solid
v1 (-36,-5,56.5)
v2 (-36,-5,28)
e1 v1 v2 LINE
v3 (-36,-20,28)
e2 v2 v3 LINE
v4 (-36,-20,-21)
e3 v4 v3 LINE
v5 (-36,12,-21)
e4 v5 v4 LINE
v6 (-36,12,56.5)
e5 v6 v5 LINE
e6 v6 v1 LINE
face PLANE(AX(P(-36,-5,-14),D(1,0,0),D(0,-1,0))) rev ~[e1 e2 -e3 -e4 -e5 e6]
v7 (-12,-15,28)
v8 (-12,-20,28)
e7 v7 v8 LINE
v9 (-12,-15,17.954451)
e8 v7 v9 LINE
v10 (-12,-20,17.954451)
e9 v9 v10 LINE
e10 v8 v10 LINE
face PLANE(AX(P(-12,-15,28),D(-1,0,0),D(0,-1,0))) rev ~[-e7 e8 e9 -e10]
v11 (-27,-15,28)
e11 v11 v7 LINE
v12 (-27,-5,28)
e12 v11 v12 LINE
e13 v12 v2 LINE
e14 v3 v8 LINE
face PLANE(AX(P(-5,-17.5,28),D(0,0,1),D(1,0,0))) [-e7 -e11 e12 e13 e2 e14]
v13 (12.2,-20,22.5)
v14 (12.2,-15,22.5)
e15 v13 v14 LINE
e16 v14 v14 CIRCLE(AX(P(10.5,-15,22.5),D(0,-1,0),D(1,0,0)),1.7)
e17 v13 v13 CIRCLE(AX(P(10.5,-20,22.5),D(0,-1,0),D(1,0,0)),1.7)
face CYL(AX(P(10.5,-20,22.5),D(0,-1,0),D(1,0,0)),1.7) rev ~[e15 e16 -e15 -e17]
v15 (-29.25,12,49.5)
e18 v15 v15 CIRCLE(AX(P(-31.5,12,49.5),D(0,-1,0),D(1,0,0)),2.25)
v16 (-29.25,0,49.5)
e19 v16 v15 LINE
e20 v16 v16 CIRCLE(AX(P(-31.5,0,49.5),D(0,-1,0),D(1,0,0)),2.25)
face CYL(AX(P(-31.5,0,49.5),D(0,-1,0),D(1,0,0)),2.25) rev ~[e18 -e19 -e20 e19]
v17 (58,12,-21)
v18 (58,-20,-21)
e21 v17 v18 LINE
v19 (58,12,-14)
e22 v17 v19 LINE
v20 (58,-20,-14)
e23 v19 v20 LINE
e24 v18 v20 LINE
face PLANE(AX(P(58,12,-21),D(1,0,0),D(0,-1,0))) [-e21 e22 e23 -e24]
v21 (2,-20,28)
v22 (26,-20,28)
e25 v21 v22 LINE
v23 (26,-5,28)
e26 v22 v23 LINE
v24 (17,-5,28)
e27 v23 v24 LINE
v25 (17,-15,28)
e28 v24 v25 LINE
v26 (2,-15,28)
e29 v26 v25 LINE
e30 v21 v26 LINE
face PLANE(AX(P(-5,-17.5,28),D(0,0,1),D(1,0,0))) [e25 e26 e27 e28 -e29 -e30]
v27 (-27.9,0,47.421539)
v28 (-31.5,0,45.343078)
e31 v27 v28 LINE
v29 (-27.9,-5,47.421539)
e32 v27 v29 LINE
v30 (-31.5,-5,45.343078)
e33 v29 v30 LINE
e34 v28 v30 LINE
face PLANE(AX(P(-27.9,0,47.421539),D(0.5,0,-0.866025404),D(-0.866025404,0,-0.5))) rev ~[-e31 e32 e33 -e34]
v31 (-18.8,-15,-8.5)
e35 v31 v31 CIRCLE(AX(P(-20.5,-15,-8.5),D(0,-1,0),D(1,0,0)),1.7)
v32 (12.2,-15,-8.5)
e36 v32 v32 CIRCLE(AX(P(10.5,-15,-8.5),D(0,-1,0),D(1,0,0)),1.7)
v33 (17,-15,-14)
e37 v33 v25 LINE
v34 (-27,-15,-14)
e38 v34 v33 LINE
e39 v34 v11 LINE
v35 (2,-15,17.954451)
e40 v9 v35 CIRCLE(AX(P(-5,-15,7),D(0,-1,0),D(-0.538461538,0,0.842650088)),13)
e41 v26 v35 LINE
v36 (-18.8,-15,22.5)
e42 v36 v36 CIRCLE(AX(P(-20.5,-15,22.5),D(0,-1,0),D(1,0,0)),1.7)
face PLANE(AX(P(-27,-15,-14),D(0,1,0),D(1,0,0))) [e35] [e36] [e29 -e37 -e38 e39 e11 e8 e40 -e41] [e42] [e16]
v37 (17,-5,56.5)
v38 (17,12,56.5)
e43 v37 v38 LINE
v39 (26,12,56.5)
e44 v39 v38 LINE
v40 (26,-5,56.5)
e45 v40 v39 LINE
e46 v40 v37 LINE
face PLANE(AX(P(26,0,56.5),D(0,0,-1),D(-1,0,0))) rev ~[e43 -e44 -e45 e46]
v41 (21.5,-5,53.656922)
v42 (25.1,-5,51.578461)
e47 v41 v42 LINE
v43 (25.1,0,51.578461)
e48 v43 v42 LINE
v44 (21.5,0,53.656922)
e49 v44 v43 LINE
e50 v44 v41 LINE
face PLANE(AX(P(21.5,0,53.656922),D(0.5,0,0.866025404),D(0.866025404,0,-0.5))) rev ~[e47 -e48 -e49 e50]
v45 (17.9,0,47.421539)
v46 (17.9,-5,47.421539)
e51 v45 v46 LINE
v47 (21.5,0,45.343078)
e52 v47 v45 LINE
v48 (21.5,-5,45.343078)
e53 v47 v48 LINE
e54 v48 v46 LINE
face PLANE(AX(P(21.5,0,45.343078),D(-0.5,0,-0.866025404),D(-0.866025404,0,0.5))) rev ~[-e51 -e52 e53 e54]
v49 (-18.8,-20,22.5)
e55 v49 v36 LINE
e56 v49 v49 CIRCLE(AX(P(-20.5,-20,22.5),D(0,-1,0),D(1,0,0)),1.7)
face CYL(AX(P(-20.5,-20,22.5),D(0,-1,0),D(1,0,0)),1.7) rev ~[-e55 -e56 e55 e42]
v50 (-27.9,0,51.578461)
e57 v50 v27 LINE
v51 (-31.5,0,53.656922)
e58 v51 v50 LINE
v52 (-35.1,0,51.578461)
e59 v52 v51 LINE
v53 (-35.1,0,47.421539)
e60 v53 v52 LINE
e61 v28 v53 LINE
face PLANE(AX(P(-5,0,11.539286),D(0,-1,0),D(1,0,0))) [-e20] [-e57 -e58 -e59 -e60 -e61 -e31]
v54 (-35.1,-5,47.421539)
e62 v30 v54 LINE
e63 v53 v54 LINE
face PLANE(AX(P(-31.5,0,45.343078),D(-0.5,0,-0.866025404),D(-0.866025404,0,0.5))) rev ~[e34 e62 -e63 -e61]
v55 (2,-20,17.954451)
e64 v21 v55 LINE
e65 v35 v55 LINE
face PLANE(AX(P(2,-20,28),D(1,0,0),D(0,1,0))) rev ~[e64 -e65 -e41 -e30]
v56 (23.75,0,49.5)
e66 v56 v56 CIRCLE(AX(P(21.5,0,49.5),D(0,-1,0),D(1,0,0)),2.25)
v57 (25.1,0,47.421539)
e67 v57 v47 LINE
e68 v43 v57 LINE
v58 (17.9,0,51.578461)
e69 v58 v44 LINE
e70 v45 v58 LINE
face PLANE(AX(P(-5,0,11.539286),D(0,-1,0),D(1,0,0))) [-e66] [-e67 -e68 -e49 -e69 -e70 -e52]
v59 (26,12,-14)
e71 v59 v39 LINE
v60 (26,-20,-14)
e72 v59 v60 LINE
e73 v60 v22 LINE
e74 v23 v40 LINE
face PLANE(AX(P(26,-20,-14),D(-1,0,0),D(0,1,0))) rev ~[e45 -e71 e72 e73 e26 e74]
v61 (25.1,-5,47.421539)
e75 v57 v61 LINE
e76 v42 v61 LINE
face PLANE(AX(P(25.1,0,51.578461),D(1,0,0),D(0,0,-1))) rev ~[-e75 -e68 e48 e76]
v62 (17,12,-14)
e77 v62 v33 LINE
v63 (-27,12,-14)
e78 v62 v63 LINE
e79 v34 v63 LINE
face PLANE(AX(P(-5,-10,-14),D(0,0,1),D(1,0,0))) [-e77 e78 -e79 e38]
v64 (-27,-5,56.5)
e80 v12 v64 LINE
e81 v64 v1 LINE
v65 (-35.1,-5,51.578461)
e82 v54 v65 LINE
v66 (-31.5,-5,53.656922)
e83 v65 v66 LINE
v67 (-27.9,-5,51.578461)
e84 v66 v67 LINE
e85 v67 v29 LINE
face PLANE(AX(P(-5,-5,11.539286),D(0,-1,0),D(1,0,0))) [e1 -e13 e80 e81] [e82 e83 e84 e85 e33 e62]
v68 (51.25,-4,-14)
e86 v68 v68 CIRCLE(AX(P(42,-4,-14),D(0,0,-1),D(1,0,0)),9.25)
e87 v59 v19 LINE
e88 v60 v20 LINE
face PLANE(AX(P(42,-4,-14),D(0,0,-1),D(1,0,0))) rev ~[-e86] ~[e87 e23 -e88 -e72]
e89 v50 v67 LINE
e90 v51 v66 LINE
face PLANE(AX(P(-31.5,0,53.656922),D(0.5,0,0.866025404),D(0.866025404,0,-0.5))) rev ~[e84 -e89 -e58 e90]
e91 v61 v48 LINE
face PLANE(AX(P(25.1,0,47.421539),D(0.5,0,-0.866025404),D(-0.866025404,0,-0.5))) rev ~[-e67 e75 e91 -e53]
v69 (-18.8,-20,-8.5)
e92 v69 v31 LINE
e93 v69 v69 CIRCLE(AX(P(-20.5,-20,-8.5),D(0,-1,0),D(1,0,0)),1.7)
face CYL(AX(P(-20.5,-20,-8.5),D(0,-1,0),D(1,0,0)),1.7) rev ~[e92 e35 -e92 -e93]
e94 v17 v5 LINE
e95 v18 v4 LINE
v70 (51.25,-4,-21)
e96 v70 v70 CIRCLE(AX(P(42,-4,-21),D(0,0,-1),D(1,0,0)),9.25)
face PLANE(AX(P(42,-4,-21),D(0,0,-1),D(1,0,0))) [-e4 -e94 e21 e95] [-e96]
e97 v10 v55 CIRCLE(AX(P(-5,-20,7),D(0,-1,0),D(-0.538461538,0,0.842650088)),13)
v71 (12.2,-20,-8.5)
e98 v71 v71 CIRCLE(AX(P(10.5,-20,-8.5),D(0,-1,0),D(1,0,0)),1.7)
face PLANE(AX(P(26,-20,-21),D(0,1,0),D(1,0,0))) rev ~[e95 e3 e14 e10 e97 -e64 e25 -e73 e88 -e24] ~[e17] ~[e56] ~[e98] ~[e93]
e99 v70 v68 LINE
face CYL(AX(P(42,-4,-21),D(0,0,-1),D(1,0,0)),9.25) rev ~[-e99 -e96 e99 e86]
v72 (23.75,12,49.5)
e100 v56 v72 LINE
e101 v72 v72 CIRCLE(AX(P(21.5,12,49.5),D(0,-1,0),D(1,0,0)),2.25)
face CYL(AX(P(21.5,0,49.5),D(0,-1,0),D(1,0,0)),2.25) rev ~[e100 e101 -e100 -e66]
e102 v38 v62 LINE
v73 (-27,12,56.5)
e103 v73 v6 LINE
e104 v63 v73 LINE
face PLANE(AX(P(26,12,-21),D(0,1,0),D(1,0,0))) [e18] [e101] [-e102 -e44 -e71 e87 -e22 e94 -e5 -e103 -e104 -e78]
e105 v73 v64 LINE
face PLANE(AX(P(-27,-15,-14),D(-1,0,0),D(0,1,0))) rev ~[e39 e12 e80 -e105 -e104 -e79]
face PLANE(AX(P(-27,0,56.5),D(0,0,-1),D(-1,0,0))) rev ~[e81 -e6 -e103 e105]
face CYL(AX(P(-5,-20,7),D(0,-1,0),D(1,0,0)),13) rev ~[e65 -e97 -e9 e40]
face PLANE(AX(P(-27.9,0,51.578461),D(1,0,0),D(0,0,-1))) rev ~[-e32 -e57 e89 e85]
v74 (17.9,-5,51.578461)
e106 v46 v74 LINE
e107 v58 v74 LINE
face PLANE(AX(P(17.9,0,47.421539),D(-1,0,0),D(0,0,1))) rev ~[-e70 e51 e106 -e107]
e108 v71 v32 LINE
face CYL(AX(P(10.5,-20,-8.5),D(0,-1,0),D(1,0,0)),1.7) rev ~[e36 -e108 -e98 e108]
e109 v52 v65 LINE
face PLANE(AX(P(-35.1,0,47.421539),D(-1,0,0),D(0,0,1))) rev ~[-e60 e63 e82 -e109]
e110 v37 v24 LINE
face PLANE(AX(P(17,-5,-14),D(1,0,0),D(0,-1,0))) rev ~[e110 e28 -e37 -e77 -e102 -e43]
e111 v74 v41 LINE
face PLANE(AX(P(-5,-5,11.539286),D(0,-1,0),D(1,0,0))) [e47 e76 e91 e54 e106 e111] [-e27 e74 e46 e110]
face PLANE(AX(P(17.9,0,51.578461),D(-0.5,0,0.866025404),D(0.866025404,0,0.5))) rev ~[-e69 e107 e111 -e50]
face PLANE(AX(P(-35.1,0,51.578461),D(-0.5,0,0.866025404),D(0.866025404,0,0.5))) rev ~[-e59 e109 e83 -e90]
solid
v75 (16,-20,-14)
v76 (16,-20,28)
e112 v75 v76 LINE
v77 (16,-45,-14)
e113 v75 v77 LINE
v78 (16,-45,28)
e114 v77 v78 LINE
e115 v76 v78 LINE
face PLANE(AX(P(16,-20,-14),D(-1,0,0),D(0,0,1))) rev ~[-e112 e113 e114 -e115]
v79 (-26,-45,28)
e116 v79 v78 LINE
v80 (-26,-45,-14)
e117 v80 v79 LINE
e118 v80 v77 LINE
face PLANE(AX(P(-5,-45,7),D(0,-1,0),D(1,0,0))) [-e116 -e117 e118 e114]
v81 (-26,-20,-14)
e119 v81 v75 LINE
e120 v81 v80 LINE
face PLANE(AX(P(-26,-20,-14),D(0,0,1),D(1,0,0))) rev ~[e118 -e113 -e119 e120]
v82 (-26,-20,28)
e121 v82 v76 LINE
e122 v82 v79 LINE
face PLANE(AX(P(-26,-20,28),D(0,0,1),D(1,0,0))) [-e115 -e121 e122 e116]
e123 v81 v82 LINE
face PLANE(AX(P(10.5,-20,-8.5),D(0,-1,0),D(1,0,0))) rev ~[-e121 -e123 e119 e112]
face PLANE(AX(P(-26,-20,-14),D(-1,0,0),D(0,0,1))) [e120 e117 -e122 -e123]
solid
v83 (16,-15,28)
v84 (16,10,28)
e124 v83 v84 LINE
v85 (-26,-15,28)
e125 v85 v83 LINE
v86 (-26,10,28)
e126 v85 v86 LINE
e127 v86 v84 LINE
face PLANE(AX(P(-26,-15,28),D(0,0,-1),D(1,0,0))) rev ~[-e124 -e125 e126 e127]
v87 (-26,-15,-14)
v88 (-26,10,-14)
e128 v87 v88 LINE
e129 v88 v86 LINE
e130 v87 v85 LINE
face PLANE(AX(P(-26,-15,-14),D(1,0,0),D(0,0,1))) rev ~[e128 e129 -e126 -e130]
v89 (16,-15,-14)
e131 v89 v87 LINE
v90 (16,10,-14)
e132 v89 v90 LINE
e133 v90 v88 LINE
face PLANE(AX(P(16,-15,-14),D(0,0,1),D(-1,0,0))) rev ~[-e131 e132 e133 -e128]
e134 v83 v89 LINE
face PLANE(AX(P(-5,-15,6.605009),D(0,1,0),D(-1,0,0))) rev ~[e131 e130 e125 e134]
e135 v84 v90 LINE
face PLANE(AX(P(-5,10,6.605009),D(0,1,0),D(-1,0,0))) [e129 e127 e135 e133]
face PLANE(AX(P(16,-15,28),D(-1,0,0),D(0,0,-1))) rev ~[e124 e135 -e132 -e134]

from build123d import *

# Parameters (mm, degrees)
F1_R      = 2.25
F2_DEPTH  = 12
F4_DEPTH  = 5
F5_W      = 44
F5_H      = 10
F5_H_2    = 5
F6_DEPTH  = 7
F7_DEPTH  = 42
F8_R      = 1.7
F8_R_2    = 13
F9_DEPTH  = 5
F11_REACH = 63.8670687473
F12_R     = 1.7
F13_DEPTH = 25
F14_W     = 42
F14_H     = 42
F14_R     = 1.7
F14_R_2   = 13
F15_DEPTH = 25
F16_W     = 32
F16_H     = 32
F16_R     = 9.25
F17_DEPTH = 7


with BuildPart() as f2:
    # F1 (on Front) → F2 (new body)
    with BuildSketch(Plane.XZ):
        Polygon((-27, 56.5), (-36, 56.5), (-36, -21), (26, -21), (26, 56.5), (17, 56.5), (17, -14), (-27, -14), align=None)
        with Locations((-31.5, 49.5)):
            Circle(F1_R, mode=Mode.SUBTRACT)
        with Locations((21.5, 49.5)):
            Circle(F1_R, mode=Mode.SUBTRACT)
    extrude(amount=-F2_DEPTH)

    # F3 (on face) → F4 (join)
    with BuildSketch(Plane.XZ):
        Polygon((-27, -14), (-27, 56.5), (-36, 56.5), (-36, -21), (26, -21), (26, 56.5), (17, 56.5), (17, -14), align=None)
        Polygon((-31.5, 53.6569219382), (-27.9, 51.5784609691), (-27.9, 47.4215390309), (-31.5, 45.3430780618), (-35.1, 47.4215390309), (-35.1, 51.5784609691), align=None, mode=Mode.SUBTRACT)
        Polygon((21.5, 53.6569219382), (25.1, 51.5784609691), (25.1, 47.4215390309), (21.5, 45.3430780618), (17.9, 47.4215390309), (17.9, 51.5784609691), align=None, mode=Mode.SUBTRACT)
    extrude(amount=F4_DEPTH)

    # F5 (on face) → F6 (join, through all)
    with BuildSketch(Plane.XY.offset(-14)):
        with Locations((-5, -10)):
            Rectangle(F5_W, F5_H)
        with Locations((-5, -17.5)):
            Rectangle(F5_W, F5_H_2)
        Polygon((-27, -15), (-27, -5), (-36, -5), (-36, -20), (-27, -20), align=None)
        Polygon((26, -5), (17, -5), (17, -15), (17, -20), (26, -20), align=None)
    extrude(amount=-F6_DEPTH)

    # F5 (on face) → F7 (join)
    with BuildSketch(Plane.XY.offset(-14)):
        with Locations((-5, -17.5)):
            Rectangle(F5_W, F5_H_2)
        Polygon((-27, -15), (-27, -5), (-36, -5), (-36, -20), (-27, -20), align=None)
        Polygon((26, -5), (17, -5), (17, -15), (17, -20), (26, -20), align=None)
    extrude(amount=F7_DEPTH)

    # F8 (on face) → F9 (cut, through all)
    with BuildSketch(Plane.XZ.offset(20)):
        with Locations((-20.5, 22.5)):
            Circle(F8_R)
        with Locations((-5, 7)):
            Circle(F8_R_2)
        with Locations((-20.5, -8.5)):
            Circle(F8_R)
        with Locations((10.5, -8.5)):
            Circle(F8_R)
        with Locations((10.5, 22.5)):
            Circle(F8_R)
    extrude(amount=-F9_DEPTH, mode=Mode.SUBTRACT)

    f11_end = f2.faces().sort_by_distance((-18, -17.5, 7))[0]
    # F10 (on face) → F11 (cut, up to a face of the model that its end follows)
    with BuildSketch(Plane.XY.offset(28)):
        Polygon((2, -15), (-5, -15), (-12, -15), (-12, -20), (2, -20), align=None)
    f11_long = extrude(amount=-F11_REACH, mode=Mode.PRIVATE)
    add(split(f11_long, bisect_by=f11_end, keep=Keep.ALL, mode=Mode.PRIVATE).solids().sort_by_distance((-5, -17.5, 28))[0], mode=Mode.SUBTRACT)

    # F16 (on face) → F17 (join, through all)
    with BuildSketch(Plane(origin=(0, 0, -21), x_dir=(1, 0, 0), z_dir=(0, 0, -1))):
        with Locations((42, 4)):
            Rectangle(F16_W, F16_H)
        with Locations((42, 4)):
            Circle(F16_R, mode=Mode.SUBTRACT)
    extrude(amount=-F17_DEPTH)


with BuildPart() as f13:
    # F12 (on face) → F13 (new body)
    with BuildSketch(Plane(origin=(0, -15, 0), x_dir=(-1, 0, 0), z_dir=(0, 1, 0))):
        with BuildLine():
            Line((-16, -14), (26, -14))
            Line((26, -14), (26, 28))
            Line((26, 28), (12, 28))
            Line((12, 28), (12, 17.9544511501))
            ThreePointArc((12, 17.9544511501), (5, -6), (-2, 17.9544511501))
            Line((-2, 17.9544511501), (-2, 28))
            Line((-2, 28), (-16, 28))
            Line((-16, 28), (-16, -14))
        make_face()
        with Locations((-10.5, -8.5)):
            Circle(F12_R, mode=Mode.SUBTRACT)
        with Locations((20.5, -8.5)):
            Circle(F12_R, mode=Mode.SUBTRACT)
        with Locations((-10.5, 22.5)):
            Circle(F12_R, mode=Mode.SUBTRACT)
        with Locations((20.5, 22.5)):
            Circle(F12_R, mode=Mode.SUBTRACT)
        with BuildLine():
            Line((12, 17.9544511501), (12, 28))
            Line((12, 28), (-2, 28))
            Line((-2, 28), (-2, 17.9544511501))
            ThreePointArc((-2, 17.9544511501), (5, -6), (12, 17.9544511501))
        make_face()
        with Locations((-10.5, 22.5)):
            Circle(F12_R)
        with Locations((20.5, 22.5)):
            Circle(F12_R)
        with Locations((-10.5, -8.5)):
            Circle(F12_R)
        with Locations((20.5, -8.5)):
            Circle(F12_R)
    extrude(amount=F13_DEPTH)


with BuildPart() as f15:
    # F14 (on face) → F15 (new body)
    with BuildSketch(Plane.XZ.offset(20)):
        with Locations((-5, 7)):
            Rectangle(F14_W, F14_H)
        with Locations((-20.5, -8.5)):
            Circle(F14_R, mode=Mode.SUBTRACT)
        with Locations((10.5, -8.5)):
            Circle(F14_R, mode=Mode.SUBTRACT)
        with Locations((-20.5, 22.5)):
            Circle(F14_R, mode=Mode.SUBTRACT)
        with Locations((-5, 7)):
            Circle(F14_R_2, mode=Mode.SUBTRACT)
        with Locations((10.5, 22.5)):
            Circle(F14_R, mode=Mode.SUBTRACT)
    extrude(amount=F15_DEPTH)

    # F8 (on face) → F15, piece 2 (join)
    with BuildSketch(Plane.XZ.offset(20)):
        with Locations((-20.5, 22.5)):
            Circle(F8_R)
    extrude(amount=F15_DEPTH)

    # F8 (on face) → F15, piece 3 (join)
    with BuildSketch(Plane.XZ.offset(20)):
        with Locations((-5, 7)):
            Circle(F8_R_2)
    extrude(amount=F15_DEPTH)

    # F8 (on face) → F15, piece 4 (join)
    with BuildSketch(Plane.XZ.offset(20)):
        with Locations((-20.5, -8.5)):
            Circle(F8_R)
    extrude(amount=F15_DEPTH)

    # F8 (on face) → F15, piece 5 (join)
    with BuildSketch(Plane.XZ.offset(20)):
        with Locations((10.5, 22.5)):
            Circle(F8_R)
    extrude(amount=F15_DEPTH)

    # F8 (on face) → F15, piece 6 (join)
    with BuildSketch(Plane.XZ.offset(20)):
        with Locations((10.5, -8.5)):
            Circle(F8_R)
    extrude(amount=F15_DEPTH)


solid = Compound([f2.part, f13.part, f15.part])
